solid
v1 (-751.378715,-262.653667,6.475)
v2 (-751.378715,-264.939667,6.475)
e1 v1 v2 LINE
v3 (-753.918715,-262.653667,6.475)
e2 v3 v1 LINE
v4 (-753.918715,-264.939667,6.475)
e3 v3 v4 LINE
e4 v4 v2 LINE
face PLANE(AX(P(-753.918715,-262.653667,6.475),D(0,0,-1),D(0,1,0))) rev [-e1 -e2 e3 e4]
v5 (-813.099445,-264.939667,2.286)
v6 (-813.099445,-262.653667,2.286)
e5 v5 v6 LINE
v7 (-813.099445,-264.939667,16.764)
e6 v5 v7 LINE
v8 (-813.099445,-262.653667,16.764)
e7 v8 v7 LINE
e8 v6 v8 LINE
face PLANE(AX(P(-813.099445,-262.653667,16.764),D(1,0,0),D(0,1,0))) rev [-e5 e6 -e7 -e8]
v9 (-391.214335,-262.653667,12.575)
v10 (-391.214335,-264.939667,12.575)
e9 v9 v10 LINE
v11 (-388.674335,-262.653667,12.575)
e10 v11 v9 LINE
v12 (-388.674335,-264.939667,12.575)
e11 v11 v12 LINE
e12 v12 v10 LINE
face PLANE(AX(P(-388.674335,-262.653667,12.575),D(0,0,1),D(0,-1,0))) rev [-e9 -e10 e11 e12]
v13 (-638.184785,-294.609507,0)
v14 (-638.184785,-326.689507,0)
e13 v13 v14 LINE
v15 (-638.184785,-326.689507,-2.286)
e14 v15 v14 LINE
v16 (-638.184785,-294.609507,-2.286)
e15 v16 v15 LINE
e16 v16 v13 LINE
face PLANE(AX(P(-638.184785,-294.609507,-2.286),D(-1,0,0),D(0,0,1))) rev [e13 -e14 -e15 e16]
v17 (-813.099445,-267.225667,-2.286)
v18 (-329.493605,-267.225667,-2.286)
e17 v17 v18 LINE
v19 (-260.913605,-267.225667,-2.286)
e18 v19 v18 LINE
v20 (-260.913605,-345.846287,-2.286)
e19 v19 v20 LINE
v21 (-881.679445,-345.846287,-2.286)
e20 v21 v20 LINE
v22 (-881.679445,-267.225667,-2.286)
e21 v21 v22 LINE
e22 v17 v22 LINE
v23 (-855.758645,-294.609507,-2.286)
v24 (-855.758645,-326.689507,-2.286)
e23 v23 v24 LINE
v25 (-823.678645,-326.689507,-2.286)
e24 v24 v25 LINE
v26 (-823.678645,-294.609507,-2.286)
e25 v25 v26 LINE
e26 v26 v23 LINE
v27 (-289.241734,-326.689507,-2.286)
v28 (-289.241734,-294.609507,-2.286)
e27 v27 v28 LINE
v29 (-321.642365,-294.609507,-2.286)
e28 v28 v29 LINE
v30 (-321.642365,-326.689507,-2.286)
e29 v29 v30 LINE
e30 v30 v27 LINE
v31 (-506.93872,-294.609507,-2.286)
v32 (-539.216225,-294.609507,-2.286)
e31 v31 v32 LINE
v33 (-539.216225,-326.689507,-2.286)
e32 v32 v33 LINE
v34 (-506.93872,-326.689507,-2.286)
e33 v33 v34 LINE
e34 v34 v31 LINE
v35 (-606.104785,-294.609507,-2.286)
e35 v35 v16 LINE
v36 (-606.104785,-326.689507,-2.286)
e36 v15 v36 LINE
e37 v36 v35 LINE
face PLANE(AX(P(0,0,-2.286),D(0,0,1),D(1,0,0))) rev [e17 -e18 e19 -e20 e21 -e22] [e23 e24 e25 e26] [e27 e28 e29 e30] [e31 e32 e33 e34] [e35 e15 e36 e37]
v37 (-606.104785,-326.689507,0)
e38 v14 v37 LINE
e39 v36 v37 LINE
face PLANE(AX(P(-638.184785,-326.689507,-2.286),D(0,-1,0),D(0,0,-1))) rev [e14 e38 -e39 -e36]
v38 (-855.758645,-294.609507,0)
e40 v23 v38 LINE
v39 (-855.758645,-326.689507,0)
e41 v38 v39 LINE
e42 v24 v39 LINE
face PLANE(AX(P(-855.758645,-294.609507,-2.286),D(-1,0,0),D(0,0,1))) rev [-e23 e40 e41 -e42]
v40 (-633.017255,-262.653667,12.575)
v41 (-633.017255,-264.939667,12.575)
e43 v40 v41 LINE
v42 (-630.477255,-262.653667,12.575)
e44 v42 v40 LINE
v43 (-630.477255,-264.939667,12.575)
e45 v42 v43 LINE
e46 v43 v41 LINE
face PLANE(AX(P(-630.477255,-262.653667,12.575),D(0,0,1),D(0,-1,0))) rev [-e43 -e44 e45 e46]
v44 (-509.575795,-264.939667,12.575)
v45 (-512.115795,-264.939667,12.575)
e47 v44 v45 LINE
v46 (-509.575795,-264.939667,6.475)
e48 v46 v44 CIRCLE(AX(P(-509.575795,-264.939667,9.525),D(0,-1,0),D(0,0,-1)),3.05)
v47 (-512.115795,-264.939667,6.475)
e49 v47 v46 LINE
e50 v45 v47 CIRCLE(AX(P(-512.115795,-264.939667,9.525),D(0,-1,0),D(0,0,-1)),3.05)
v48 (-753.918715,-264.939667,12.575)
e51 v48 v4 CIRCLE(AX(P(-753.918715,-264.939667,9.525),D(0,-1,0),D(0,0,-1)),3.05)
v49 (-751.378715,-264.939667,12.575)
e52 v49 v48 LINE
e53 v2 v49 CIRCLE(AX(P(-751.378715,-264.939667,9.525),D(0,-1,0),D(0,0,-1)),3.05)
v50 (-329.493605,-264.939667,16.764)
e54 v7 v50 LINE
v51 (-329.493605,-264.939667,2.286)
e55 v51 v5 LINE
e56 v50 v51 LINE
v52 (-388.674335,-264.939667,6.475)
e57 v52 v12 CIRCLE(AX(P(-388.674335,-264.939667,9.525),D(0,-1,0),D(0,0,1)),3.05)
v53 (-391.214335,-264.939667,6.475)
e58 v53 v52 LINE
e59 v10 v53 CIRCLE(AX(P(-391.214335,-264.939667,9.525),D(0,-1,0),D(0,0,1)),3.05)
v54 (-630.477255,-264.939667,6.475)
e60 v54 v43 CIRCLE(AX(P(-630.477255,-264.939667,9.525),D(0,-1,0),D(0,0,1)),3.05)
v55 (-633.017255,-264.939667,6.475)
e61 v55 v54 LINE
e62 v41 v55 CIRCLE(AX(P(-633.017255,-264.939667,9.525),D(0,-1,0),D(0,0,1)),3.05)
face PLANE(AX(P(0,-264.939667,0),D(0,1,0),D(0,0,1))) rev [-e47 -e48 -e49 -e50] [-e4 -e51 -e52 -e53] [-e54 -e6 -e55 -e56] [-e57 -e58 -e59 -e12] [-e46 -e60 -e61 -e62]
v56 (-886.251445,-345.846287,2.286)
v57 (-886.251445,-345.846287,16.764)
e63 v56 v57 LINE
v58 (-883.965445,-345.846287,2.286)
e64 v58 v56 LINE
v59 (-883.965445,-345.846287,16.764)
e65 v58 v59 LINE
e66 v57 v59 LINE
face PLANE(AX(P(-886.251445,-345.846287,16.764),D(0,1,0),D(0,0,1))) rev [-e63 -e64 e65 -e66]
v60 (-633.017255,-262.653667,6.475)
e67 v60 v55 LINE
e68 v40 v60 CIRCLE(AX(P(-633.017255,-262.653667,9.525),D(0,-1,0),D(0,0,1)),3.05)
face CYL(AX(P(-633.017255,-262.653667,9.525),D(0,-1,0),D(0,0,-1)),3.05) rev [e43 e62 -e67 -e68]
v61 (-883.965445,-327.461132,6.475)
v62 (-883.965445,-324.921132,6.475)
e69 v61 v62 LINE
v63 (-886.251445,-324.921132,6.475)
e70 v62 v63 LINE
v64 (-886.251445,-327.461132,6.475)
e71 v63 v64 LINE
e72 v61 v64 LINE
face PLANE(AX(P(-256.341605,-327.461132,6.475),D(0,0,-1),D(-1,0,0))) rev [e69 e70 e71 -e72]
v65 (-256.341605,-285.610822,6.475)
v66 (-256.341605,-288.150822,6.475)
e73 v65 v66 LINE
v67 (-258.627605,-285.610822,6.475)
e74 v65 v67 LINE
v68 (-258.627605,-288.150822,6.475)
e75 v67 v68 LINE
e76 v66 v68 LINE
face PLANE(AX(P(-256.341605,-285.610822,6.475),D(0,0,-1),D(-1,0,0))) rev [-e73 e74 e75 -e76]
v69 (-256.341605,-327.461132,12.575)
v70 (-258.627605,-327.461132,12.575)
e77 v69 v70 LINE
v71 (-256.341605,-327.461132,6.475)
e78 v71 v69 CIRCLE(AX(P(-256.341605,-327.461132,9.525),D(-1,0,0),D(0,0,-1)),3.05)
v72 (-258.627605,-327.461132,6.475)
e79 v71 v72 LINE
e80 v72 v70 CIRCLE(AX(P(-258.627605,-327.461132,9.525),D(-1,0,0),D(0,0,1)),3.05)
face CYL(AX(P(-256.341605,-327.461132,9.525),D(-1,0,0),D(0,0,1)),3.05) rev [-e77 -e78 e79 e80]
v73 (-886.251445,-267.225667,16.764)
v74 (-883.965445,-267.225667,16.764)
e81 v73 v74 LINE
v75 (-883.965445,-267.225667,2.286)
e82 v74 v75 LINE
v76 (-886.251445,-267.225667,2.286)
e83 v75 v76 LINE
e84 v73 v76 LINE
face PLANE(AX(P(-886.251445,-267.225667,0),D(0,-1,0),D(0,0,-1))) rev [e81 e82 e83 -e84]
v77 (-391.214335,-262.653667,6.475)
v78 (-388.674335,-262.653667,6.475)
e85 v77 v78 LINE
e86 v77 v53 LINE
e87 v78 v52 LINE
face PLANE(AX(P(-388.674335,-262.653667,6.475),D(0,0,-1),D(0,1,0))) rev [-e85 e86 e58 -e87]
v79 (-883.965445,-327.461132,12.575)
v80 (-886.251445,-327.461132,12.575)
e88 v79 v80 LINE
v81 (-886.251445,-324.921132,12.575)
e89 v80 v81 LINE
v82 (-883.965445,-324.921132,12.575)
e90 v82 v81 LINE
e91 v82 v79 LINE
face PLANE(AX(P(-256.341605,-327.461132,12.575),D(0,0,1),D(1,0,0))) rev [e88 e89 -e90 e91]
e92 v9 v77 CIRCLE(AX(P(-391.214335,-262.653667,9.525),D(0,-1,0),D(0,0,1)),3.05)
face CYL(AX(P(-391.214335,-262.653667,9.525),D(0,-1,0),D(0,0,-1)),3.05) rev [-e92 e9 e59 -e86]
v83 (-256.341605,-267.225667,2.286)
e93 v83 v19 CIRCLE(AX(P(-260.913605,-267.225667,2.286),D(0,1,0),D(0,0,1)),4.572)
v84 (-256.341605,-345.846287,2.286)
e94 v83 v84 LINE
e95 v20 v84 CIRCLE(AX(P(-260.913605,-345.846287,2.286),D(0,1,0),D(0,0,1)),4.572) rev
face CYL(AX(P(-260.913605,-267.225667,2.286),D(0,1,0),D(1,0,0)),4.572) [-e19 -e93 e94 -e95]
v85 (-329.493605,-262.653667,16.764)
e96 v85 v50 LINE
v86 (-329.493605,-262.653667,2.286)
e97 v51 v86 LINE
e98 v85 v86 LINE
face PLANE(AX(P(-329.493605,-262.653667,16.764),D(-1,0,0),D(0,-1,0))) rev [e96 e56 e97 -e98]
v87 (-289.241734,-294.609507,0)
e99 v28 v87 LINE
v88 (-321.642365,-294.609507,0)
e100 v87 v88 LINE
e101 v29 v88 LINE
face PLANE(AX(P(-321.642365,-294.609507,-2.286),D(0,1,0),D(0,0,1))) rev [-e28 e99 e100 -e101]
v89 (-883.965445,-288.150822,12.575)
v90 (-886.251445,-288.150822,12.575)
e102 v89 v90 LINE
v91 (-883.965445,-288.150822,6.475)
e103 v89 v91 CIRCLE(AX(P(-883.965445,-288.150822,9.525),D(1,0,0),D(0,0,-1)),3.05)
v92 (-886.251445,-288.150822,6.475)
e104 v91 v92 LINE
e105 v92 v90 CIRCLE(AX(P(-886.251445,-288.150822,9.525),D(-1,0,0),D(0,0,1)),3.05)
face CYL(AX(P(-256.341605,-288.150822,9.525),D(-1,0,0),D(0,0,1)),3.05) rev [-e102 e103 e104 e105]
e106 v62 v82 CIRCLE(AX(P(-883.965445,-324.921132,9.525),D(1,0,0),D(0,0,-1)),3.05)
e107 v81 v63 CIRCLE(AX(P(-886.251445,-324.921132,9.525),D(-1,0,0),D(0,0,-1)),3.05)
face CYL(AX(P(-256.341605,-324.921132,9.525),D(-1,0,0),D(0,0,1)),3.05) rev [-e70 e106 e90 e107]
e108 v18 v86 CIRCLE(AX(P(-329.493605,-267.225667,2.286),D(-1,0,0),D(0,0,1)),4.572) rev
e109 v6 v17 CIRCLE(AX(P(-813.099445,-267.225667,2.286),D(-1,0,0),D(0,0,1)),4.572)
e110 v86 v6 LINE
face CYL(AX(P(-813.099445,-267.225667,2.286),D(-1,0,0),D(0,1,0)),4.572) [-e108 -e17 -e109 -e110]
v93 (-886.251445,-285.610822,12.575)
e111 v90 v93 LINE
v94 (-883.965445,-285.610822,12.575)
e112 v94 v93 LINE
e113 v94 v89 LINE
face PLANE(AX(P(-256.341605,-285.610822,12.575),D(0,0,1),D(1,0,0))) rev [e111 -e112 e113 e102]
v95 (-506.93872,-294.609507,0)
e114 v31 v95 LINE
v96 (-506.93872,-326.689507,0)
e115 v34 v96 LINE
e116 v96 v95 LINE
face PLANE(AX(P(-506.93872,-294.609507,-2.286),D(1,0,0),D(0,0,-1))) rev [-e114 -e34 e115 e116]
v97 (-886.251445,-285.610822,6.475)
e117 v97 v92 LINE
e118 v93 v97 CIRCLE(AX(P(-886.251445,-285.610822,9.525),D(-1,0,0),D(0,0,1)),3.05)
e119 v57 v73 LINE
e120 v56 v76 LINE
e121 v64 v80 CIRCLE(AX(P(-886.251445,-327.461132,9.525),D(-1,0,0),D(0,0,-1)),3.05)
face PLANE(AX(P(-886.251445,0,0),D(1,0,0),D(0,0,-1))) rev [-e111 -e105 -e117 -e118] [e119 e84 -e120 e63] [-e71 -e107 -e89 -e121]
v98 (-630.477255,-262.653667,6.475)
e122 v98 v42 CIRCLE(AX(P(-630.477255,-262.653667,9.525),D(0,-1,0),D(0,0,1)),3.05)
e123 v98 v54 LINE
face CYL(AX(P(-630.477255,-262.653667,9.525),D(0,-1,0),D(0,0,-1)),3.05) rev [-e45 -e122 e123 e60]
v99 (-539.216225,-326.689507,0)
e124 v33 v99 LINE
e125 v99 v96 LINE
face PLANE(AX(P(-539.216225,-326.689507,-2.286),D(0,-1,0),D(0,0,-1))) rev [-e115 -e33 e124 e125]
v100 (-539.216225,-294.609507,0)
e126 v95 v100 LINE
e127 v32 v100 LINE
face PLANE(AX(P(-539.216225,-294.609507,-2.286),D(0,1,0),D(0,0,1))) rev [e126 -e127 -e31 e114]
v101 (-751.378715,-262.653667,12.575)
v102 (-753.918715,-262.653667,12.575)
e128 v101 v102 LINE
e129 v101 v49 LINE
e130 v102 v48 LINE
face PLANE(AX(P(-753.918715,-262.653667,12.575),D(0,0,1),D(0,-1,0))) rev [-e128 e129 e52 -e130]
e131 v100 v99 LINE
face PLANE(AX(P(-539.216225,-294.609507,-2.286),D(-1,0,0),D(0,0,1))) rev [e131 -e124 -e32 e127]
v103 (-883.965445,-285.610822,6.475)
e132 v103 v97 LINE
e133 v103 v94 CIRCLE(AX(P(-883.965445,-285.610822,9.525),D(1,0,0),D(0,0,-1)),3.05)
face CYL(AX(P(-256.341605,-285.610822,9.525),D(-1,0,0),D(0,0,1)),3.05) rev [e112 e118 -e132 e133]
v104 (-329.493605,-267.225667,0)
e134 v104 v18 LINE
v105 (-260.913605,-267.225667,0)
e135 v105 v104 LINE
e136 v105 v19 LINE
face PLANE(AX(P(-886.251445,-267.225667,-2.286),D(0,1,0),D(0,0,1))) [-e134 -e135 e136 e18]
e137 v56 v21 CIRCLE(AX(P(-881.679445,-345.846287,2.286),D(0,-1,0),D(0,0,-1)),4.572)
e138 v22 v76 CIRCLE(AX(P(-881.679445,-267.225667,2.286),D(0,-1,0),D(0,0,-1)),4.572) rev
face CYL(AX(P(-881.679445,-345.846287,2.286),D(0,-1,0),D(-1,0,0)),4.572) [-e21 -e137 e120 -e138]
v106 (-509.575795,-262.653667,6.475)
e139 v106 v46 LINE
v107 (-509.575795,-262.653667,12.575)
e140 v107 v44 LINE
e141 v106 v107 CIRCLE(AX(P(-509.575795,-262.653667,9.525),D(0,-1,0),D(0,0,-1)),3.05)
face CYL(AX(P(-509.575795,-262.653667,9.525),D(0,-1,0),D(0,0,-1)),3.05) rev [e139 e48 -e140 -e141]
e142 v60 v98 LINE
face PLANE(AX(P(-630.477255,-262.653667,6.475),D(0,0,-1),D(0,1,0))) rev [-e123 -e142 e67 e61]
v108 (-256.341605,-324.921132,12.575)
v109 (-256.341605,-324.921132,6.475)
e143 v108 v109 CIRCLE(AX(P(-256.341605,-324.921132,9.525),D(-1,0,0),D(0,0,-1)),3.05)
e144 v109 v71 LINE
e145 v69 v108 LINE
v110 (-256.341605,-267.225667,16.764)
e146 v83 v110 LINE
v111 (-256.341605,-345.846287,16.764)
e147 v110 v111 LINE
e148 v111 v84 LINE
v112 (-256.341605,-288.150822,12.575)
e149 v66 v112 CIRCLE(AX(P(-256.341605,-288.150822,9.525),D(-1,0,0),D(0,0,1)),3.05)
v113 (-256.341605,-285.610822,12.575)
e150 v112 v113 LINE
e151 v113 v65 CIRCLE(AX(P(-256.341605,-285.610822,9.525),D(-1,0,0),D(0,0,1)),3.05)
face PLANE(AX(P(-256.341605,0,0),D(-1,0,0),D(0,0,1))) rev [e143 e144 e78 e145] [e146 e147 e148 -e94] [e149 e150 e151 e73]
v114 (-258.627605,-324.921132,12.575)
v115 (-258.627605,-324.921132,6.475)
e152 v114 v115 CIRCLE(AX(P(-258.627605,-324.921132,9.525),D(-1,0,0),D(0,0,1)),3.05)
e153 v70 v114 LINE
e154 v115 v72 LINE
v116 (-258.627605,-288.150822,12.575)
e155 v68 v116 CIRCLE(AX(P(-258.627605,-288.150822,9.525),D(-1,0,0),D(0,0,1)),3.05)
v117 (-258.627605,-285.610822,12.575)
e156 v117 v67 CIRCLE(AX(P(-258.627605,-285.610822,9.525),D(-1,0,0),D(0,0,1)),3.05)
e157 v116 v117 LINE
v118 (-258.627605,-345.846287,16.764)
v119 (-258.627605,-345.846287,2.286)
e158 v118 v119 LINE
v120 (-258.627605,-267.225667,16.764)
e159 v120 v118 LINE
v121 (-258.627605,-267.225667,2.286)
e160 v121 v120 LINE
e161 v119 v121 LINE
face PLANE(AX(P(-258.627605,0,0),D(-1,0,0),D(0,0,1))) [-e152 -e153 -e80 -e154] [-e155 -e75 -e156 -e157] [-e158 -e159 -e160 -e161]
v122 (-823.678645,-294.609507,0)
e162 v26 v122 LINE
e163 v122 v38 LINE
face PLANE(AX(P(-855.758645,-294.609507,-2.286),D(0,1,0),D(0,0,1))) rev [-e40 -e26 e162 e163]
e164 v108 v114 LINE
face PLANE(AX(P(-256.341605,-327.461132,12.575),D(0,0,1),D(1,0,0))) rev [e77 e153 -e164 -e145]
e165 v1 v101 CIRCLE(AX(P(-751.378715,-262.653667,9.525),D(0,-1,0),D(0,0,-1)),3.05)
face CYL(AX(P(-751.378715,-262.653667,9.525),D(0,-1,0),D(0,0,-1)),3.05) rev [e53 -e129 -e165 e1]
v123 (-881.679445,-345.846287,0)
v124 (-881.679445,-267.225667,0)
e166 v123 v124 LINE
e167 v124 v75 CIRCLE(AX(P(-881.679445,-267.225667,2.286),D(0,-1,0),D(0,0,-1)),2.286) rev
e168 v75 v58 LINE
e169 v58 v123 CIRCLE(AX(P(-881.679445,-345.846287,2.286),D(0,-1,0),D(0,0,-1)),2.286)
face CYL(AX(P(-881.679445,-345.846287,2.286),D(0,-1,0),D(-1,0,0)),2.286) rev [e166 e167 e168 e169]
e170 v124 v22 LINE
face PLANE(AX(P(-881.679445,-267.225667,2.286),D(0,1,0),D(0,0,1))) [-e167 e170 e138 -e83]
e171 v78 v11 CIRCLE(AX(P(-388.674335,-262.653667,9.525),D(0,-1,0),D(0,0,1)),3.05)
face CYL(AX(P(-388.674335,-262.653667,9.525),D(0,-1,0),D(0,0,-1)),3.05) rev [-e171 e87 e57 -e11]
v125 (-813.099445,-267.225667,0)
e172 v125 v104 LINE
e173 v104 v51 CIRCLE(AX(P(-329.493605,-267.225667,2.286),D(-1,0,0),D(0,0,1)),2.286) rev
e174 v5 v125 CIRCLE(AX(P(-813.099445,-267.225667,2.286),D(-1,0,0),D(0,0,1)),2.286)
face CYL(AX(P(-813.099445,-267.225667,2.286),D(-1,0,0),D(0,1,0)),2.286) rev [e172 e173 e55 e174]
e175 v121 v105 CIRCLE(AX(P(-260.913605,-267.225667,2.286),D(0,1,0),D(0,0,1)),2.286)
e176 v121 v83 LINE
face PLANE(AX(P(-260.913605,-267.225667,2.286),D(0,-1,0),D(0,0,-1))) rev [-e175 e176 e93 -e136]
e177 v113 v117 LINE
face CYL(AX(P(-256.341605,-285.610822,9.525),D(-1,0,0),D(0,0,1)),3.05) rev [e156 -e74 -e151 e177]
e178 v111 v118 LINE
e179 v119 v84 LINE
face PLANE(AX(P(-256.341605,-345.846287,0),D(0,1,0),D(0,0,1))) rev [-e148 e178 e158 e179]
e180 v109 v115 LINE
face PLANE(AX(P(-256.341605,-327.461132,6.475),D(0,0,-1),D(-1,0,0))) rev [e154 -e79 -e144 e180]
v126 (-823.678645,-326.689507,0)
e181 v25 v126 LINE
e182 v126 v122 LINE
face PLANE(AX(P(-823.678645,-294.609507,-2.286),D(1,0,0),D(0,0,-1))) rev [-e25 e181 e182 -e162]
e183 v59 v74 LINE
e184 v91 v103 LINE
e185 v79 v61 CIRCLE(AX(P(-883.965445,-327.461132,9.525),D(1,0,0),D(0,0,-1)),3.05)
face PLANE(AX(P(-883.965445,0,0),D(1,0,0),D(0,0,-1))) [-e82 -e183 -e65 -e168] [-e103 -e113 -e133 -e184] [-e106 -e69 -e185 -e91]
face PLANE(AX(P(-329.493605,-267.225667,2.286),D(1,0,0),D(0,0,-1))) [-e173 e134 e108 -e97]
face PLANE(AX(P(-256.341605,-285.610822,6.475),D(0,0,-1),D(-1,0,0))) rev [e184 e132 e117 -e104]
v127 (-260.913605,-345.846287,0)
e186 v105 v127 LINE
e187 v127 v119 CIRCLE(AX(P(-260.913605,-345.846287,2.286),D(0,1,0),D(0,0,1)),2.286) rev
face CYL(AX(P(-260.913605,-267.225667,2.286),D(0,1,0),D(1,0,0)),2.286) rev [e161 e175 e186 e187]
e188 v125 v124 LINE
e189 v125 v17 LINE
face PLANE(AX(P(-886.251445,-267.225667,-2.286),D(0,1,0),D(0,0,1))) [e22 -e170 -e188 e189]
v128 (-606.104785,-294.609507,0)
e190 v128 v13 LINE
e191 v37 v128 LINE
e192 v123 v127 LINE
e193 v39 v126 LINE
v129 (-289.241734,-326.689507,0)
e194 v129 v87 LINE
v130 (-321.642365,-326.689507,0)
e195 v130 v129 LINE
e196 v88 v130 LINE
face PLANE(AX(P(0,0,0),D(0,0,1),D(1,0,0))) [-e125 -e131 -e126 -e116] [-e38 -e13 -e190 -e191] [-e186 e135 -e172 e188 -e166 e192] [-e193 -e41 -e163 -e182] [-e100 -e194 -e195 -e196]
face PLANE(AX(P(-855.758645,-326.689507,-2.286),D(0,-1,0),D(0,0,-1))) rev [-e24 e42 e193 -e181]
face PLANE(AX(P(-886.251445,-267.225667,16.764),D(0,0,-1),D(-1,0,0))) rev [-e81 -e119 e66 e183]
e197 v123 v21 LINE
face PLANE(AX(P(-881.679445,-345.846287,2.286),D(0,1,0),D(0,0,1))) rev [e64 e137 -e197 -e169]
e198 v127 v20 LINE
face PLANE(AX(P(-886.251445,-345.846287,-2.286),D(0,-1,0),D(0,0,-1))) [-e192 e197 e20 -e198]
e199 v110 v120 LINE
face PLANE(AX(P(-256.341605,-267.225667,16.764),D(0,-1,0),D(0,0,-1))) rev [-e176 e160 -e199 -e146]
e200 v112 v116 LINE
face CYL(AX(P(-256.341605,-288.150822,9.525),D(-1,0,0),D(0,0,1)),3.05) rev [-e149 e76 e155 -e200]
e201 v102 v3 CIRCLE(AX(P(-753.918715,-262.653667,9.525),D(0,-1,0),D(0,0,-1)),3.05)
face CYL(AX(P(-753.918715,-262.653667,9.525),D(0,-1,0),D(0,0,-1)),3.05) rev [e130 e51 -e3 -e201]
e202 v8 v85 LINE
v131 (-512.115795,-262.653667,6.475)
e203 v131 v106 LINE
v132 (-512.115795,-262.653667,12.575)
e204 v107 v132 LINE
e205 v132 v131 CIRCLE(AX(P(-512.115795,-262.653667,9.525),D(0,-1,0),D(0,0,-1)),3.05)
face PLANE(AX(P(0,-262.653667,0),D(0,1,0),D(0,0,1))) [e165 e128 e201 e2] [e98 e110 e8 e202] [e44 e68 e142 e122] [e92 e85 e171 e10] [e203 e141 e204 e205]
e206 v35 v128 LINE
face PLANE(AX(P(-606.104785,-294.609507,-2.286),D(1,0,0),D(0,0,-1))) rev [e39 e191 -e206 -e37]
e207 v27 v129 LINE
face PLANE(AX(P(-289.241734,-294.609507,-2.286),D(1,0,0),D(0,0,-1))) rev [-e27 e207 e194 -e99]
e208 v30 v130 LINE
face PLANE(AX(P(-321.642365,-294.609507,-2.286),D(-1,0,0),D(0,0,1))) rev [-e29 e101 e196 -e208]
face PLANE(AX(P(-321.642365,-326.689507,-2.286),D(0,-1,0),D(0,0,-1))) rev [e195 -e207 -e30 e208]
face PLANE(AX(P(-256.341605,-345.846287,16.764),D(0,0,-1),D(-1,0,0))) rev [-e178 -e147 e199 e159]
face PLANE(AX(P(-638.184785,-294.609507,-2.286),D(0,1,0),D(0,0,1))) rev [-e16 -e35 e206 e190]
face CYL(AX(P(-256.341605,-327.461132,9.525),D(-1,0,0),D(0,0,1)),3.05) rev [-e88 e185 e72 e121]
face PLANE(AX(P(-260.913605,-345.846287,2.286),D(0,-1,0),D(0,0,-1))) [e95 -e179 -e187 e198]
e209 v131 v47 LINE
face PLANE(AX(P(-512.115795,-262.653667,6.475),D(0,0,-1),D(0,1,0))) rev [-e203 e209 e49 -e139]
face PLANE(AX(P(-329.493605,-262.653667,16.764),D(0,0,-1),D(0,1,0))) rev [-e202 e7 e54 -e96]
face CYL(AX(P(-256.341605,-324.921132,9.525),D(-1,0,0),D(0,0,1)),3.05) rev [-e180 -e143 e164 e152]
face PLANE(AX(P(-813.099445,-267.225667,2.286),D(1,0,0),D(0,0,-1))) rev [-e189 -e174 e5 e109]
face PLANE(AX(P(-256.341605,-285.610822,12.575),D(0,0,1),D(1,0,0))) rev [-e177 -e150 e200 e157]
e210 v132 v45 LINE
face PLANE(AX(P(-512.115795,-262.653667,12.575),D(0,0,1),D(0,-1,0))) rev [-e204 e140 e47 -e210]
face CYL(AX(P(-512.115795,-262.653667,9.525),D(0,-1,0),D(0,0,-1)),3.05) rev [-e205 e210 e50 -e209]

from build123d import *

# Parameters (mm, degrees)
SKETCH1_W                      = 629.90984
SKETCH1_H                      = 78.62062
SKETCH1_W_2                    = 32.08
SKETCH1_H_2                    = 32.08
SKETCH1_W_3                    = 32.277504859
SKETCH1_H_3                    = 32.079999999
SKETCH1_W_4                    = 32.400630989
BASE_FLANGE1_DEPTH             = 2.286
EDGE_FLANGE1_STRIP_W           = 13.716
EDGE_FLANGE1_STRIP_H           = 2.286
EDGE_FLANGE1_STRIP_CUT_DEPTH   = 78.62062
EDGE_FLANGE1_STRIP_2_W         = 13.716
EDGE_FLANGE1_STRIP_2_H         = 2.286
EDGE_FLANGE1_STRIP_CUT_2_DEPTH = 78.62062
EDGE_FLANGE1_DEPTH             = 78.62062
EDGE_FLANGE1_BEND_DEPTH        = 78.62062
EDGE_FLANGE2_DEPTH             = 483.60584
CUT_EXTRUDE2_DEPTH             = 719.802540597
CUT_EXTRUDE3_DEPTH             = 891.094678327


# Sheet-metal steps are written as plain solids
with BuildPart() as part:
    # Sketch1 → Base-Flange1 (new body)
    with BuildSketch(Plane.XY):
        with Locations((-571.296524868, -306.535976872)):
            Rectangle(SKETCH1_W, SKETCH1_H)
        with Locations((-839.718644868, -310.649506872)):
            Rectangle(SKETCH1_W_2, SKETCH1_H_2, mode=Mode.SUBTRACT)
        with Locations((-622.144784868, -310.649506872)):
            Rectangle(SKETCH1_W_2, SKETCH1_H_2, mode=Mode.SUBTRACT)
        with Locations((-523.077472438, -310.649506873)):
            Rectangle(SKETCH1_W_3, SKETCH1_H_3, mode=Mode.SUBTRACT)
        with Locations((-305.442049373, -310.649506872)):
            Rectangle(SKETCH1_W_4, SKETCH1_H_2, mode=Mode.SUBTRACT)
    extrude(amount=-BASE_FLANGE1_DEPTH)

    # Edge-Flange1 strip (across the edge) → Edge-Flange1 strip cut (cut)
    with BuildSketch(Plane(origin=(-256.341604868, -345.846286872, 0), x_dir=(-1, 0, 0), z_dir=(0, 1, 0))):
        with Locations((-2.286, -1.143)):
            Rectangle(EDGE_FLANGE1_STRIP_W, EDGE_FLANGE1_STRIP_H)
    extrude(amount=EDGE_FLANGE1_STRIP_CUT_DEPTH, mode=Mode.SUBTRACT)

    # Edge-Flange1 strip 2 (across the edge) → Edge-Flange1 strip cut 2 (cut)
    with BuildSketch(Plane(origin=(-886.251444868, -267.225666872, 0), x_dir=(1, 0, 0), z_dir=(0, -1, 0))):
        with Locations((-2.286, -1.143)):
            Rectangle(EDGE_FLANGE1_STRIP_2_W, EDGE_FLANGE1_STRIP_2_H)
    extrude(amount=EDGE_FLANGE1_STRIP_CUT_2_DEPTH, mode=Mode.SUBTRACT)

    # Edge-Flange1 section (across the edge) → Edge-Flange1 (add)
    with BuildSketch(Plane(origin=(-256.341604868, -345.846286872, 0), x_dir=(-1, 0, 0), z_dir=(0, 1, 0))):
        with BuildLine():
            Line((0, 2.286), (0, 16.764))
            Line((0, 16.764), (2.286, 16.764))
            Line((2.286, 16.764), (2.286, 2.286))
            ThreePointArc((2.286, 2.286), (2.955553898, 0.669553898), (4.572, 0))
            Line((4.572, 0), (4.572, -2.286))
            ThreePointArc((4.572, -2.286), (1.339107796, -0.946892204), (0, 2.286))
        make_face()
    extrude(amount=EDGE_FLANGE1_DEPTH)

    # Edge-Flange1 section 2 (across the edge) → Edge-Flange1 bend (add)
    with BuildSketch(Plane(origin=(-886.251444868, -267.225666872, 0), x_dir=(1, 0, 0), z_dir=(0, -1, 0))):
        with BuildLine():
            Line((0, 2.286), (0, 16.764))
            Line((0, 16.764), (2.286, 16.764))
            Line((2.286, 16.764), (2.286, 2.286))
            ThreePointArc((2.286, 2.286), (2.955553898, 0.669553898), (4.572, 0))
            Line((4.572, 0), (4.572, -2.286))
            ThreePointArc((4.572, -2.286), (1.339107796, -0.946892204), (0, 2.286))
        make_face()
    extrude(amount=EDGE_FLANGE1_BEND_DEPTH)

    # Edge-Flange2 section (across the edge) → Edge-Flange2 (add)
    with BuildSketch(Plane(origin=(-329.493604868, -264.939666872, 0), x_dir=(0, -1, 0), z_dir=(-1, 0, 0))):
        with BuildLine():
            Line((-2.286, 2.286), (-2.286, 16.764))
            Line((-2.286, 16.764), (0, 16.764))
            Line((0, 16.764), (0, 2.286))
            ThreePointArc((0, 2.286), (0.669553898, 0.669553898), (2.286, 0))
            Line((2.286, 0), (2.286, -2.286))
            ThreePointArc((2.286, -2.286), (-0.946892204, -0.946892204), (-2.286, 2.286))
        make_face()
    extrude(amount=EDGE_FLANGE2_DEPTH)

    # Sketch26 → Cut-Extrude2 (cut, through all)
    with BuildSketch(Plane.ZY.offset(886.251444868)):
        with BuildLine():
            Line((12.575, -285.610821872), (12.575, -288.150821872))
            ThreePointArc((12.575, -288.150821872), (9.525, -291.200821872), (6.475, -288.150821872))
            Line((6.475, -288.150821872), (6.475, -285.610821872))
            ThreePointArc((6.475, -285.610821872), (9.525, -282.560821872), (12.575, -285.610821872))
        make_face()
        with BuildLine():
            Line((12.575, -327.461131872), (12.575, -324.921131872))
            ThreePointArc((12.575, -324.921131872), (9.525, -321.871131872), (6.475, -324.921131872))
            Line((6.475, -324.921131872), (6.475, -327.461131872))
            ThreePointArc((6.475, -327.461131872), (9.525, -330.511131872), (12.575, -327.461131872))
        make_face()
    extrude(amount=-CUT_EXTRUDE2_DEPTH, mode=Mode.SUBTRACT)

    # Sketch27 → Cut-Extrude3 (cut, through all)
    with BuildSketch(Plane.XZ.offset(264.939666872)):
        with BuildLine():
            Line((-753.918714868, 12.575), (-751.378714868, 12.575))
            ThreePointArc((-751.378714868, 12.575), (-748.328714868, 9.525), (-751.378714868, 6.475))
            Line((-751.378714868, 6.475), (-753.918714868, 6.475))
            ThreePointArc((-753.918714868, 6.475), (-756.968714868, 9.525), (-753.918714868, 12.575))
        make_face()
        with BuildLine():
            Line((-630.477254868, 12.575), (-633.017254868, 12.575))
            ThreePointArc((-633.017254868, 12.575), (-636.067254868, 9.525), (-633.017254868, 6.475))
            Line((-633.017254868, 6.475), (-630.477254868, 6.475))
            ThreePointArc((-630.477254868, 6.475), (-627.427254868, 9.525), (-630.477254868, 12.575))
        make_face()
        with BuildLine():
            Line((-388.674334868, 12.575), (-391.214334868, 12.575))
            ThreePointArc((-391.214334868, 12.575), (-394.264334868, 9.525), (-391.214334868, 6.475))
            Line((-391.214334868, 6.475), (-388.674334868, 6.475))
            ThreePointArc((-388.674334868, 6.475), (-385.624334868, 9.525), (-388.674334868, 12.575))
        make_face()
        with BuildLine():
            Line((-512.115794868, 12.575), (-509.575794868, 12.575))
            ThreePointArc((-509.575794868, 12.575), (-506.525794868, 9.525), (-509.575794868, 6.475))
            Line((-509.575794868, 6.475), (-512.115794868, 6.475))
            ThreePointArc((-512.115794868, 6.475), (-515.165794868, 9.525), (-512.115794868, 12.575))
        make_face()
    extrude(amount=-CUT_EXTRUDE3_DEPTH, mode=Mode.SUBTRACT)


solid = part.part
